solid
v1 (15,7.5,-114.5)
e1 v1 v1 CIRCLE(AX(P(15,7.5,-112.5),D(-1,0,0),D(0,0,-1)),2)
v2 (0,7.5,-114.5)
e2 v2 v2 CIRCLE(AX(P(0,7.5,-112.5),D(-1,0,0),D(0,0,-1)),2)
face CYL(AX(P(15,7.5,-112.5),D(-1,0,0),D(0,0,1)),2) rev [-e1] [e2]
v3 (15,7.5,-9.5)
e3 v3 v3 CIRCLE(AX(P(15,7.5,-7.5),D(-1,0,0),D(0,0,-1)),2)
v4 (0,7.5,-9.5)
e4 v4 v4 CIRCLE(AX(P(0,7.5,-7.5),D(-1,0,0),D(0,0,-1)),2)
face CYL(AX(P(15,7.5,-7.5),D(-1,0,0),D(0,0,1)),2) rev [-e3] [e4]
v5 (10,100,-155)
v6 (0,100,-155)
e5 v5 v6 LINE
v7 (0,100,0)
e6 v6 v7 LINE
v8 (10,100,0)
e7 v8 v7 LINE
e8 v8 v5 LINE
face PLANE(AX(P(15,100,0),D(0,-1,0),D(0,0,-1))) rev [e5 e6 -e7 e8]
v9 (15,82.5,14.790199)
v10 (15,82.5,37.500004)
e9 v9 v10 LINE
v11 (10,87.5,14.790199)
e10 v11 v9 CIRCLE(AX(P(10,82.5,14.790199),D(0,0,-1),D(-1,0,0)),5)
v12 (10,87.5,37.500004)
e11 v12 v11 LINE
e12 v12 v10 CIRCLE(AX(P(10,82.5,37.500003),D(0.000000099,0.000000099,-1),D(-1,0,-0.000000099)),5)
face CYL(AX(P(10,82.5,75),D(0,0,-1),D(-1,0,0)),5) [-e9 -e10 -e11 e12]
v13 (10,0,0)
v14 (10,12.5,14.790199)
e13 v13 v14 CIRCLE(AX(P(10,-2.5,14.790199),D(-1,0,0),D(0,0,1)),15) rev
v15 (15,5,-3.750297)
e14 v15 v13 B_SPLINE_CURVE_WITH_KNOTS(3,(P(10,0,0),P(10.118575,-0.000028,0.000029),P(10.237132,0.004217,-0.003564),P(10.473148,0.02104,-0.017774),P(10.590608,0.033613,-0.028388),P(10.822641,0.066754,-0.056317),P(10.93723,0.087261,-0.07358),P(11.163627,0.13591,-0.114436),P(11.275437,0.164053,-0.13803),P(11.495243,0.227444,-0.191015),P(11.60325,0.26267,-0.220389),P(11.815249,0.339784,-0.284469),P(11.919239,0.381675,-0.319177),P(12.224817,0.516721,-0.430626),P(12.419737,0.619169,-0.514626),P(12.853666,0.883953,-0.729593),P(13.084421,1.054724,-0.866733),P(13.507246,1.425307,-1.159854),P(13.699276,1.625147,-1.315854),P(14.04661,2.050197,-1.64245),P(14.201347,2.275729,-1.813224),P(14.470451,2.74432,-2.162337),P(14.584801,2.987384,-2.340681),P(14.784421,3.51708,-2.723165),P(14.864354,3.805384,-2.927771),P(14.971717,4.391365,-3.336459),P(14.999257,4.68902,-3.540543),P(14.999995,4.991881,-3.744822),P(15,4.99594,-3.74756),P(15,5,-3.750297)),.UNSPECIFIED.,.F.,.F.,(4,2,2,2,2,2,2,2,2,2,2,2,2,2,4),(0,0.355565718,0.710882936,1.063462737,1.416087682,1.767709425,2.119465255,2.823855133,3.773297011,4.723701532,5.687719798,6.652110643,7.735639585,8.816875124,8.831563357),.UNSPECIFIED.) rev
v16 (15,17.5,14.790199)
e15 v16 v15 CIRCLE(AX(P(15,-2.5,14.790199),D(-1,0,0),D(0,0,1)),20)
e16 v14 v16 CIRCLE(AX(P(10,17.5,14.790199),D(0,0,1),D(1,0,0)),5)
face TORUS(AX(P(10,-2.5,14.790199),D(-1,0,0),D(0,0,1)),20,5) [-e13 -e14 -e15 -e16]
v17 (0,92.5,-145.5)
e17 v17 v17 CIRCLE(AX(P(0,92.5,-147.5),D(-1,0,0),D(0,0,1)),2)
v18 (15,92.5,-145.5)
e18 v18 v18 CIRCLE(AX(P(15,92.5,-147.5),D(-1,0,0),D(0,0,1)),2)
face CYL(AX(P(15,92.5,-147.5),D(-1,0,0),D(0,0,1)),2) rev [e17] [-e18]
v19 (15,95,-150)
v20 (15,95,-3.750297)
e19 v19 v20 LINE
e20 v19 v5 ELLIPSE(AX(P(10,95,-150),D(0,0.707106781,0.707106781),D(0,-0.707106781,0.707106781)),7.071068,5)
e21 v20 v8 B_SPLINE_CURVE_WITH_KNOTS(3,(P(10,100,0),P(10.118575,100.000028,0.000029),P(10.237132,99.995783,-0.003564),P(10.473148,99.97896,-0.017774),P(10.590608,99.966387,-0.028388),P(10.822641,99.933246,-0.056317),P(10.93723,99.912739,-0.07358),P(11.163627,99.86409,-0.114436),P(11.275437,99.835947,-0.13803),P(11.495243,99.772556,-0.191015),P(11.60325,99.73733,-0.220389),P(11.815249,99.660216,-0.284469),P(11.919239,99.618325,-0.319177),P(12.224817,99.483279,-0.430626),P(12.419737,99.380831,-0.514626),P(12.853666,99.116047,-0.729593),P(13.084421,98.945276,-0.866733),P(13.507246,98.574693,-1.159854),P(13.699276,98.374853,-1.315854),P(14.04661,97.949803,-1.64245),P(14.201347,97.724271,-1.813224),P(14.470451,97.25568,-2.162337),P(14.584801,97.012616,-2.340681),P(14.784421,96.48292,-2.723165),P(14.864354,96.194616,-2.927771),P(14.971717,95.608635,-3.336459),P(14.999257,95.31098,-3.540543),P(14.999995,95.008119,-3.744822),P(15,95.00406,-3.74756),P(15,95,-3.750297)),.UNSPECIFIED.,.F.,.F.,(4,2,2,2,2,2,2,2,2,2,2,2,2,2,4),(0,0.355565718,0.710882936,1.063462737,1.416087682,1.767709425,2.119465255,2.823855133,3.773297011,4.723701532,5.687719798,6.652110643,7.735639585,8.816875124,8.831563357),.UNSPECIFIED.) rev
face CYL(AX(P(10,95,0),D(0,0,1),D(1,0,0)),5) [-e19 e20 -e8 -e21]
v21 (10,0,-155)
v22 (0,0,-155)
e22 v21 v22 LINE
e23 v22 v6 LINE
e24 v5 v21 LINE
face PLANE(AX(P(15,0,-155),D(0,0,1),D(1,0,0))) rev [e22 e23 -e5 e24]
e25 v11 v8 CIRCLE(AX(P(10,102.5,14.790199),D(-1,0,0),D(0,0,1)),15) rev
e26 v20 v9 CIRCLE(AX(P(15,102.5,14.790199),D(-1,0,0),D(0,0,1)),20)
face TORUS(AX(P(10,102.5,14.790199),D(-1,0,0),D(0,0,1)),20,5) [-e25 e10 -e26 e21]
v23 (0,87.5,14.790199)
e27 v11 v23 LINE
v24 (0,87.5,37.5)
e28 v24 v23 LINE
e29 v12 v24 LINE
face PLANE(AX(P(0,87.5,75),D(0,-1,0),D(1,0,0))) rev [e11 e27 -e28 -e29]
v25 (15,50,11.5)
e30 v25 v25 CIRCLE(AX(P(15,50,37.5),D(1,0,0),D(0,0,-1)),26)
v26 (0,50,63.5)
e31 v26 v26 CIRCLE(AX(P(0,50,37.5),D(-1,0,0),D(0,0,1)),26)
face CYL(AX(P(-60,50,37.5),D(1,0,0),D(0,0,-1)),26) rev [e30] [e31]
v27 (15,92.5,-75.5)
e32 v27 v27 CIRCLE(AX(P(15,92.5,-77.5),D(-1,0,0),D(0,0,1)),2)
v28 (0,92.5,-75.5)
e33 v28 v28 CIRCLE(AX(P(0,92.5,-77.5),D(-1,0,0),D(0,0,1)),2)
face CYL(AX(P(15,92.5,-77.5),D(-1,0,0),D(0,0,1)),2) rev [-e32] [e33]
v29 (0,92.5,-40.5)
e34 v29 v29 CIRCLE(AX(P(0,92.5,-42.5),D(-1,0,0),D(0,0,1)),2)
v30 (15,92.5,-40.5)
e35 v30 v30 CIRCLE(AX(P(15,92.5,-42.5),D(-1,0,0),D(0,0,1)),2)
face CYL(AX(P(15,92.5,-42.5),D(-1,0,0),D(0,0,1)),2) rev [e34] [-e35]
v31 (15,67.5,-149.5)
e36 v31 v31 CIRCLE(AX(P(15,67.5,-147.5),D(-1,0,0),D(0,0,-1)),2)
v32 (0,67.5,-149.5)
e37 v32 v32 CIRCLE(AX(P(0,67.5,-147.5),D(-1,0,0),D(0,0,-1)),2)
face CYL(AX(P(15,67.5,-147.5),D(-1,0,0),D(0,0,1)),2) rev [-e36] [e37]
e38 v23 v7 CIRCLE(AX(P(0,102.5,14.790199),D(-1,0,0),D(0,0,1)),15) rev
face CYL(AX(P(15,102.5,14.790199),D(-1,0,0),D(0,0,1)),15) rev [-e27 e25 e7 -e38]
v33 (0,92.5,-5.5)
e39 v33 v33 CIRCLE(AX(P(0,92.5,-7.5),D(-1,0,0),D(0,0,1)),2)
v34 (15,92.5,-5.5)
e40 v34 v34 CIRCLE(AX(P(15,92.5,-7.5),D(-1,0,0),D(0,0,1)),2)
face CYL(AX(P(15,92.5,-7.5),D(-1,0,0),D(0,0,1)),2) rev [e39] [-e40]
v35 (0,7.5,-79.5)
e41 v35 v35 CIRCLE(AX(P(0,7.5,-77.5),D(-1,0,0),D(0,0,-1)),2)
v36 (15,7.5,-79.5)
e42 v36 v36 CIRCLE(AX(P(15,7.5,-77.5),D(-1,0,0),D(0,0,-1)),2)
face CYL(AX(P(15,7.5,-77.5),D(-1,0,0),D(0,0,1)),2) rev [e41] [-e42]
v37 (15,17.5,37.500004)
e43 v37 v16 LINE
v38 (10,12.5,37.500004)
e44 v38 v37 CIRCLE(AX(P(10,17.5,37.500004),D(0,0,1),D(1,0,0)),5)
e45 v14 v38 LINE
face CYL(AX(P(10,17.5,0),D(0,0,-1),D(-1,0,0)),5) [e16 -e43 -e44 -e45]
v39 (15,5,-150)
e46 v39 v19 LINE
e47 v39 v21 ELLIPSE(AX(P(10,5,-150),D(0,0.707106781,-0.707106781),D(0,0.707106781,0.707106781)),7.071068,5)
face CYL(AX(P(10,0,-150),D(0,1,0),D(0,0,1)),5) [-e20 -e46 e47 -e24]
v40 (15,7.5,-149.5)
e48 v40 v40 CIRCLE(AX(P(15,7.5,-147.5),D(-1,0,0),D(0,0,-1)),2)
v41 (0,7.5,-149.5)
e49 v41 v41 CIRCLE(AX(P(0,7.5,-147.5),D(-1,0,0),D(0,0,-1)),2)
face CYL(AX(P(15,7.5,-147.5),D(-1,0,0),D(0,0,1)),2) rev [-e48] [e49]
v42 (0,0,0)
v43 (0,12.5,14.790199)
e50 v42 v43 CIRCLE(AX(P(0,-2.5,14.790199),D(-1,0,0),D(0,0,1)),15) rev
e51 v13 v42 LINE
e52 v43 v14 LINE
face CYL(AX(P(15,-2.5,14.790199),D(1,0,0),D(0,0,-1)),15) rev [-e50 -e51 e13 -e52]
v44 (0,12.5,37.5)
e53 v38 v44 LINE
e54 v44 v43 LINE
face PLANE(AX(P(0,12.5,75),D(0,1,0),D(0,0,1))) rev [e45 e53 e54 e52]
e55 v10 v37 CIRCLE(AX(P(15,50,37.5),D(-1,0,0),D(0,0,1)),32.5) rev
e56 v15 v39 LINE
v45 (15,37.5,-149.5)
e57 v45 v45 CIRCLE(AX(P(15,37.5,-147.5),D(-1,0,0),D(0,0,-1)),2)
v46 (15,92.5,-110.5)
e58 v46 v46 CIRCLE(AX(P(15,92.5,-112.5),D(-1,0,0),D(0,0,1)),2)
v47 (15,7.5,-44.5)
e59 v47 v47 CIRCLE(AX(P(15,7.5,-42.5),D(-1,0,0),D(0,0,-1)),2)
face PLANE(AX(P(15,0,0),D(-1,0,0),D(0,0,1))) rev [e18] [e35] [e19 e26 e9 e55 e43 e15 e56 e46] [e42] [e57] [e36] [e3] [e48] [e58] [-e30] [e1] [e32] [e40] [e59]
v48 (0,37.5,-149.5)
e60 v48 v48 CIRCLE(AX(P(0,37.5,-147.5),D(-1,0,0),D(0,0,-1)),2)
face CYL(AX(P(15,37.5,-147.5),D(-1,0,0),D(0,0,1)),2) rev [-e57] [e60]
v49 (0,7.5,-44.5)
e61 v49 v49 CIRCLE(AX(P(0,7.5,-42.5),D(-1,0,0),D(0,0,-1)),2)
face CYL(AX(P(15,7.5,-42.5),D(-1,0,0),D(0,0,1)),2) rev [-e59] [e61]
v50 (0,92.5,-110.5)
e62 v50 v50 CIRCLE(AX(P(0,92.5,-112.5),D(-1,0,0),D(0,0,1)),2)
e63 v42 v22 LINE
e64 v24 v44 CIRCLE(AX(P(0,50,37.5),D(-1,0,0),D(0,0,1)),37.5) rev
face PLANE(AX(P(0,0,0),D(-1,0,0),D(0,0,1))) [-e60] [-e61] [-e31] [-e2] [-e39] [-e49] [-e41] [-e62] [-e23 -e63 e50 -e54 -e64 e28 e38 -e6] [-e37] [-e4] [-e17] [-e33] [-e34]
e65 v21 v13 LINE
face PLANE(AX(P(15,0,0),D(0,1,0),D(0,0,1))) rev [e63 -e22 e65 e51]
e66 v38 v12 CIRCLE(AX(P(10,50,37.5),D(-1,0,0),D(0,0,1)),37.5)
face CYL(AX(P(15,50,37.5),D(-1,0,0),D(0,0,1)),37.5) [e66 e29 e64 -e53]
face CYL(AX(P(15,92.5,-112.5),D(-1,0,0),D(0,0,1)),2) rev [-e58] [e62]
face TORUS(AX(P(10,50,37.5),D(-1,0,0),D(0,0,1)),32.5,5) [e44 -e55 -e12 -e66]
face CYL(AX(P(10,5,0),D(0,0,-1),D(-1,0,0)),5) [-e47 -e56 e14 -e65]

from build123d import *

# Parameters (mm, degrees)
SKETCH1_W           = 155
SKETCH1_H           = 100
BOSS_EXTRUDE1_DEPTH = 15
SKETCH2_W           = 15
SKETCH2_H           = 75
BOSS_EXTRUDE2_DEPTH = 75
SKETCH3_R           = 26
CUT_EXTRUDE1_DEPTH  = 75
CUT_EXTRUDE2_START  = -15
CUT_EXTRUDE2_DEPTH  = 15
FILLET1_R           = 15
SKETCH5_R           = 2
CUT_EXTRUDE3_DEPTH  = 186.067555233
FILLET7_R           = 5


# Read off the part's stored shape, not the designer's step: Cut-Extrude2
with BuildPart() as part:
    # Sketch1 → Boss-Extrude1 (new body)
    with BuildSketch(Plane(origin=(0, 0, 0), x_dir=(0, 0, -1), z_dir=(1, 0, 0))):
        with Locations((77.5, 50)):
            Rectangle(SKETCH1_W, SKETCH1_H)
    extrude(amount=BOSS_EXTRUDE1_DEPTH)

    # Sketch2 → Boss-Extrude2 (add)
    with BuildSketch(Plane.XY):
        with Locations((7.5, 50)):
            Rectangle(SKETCH2_W, SKETCH2_H)
    extrude(amount=BOSS_EXTRUDE2_DEPTH)

    # Sketch3 → Cut-Extrude1 (cut)
    with BuildSketch(Plane(origin=(15, 0, 0), x_dir=(0, 0, -1), z_dir=(1, 0, 0))):
        with Locations((-37.5, 50)):
            Circle(SKETCH3_R)
    extrude(amount=-CUT_EXTRUDE1_DEPTH, mode=Mode.SUBTRACT)

    # Cut-Extrude2 outline → Cut-Extrude2 (cut)
    with BuildSketch(Plane(origin=(15, 0, 0), x_dir=(0, 0, -1), z_dir=(1, 0, 0)).offset(CUT_EXTRUDE2_START)):
        with BuildLine():
            Line((-75, 12.5), (-37.5, 12.5))
            ThreePointArc((-37.5, 12.5), (-64.016504294, 23.483495706), (-75, 50))
            Line((-75, 50), (-75, 12.5))
        make_face()
        with BuildLine():
            Line((-75, 87.5), (-75, 50))
            ThreePointArc((-75, 50), (-64.016504294, 76.516504294), (-37.5, 87.5))
            Line((-37.5, 87.5), (-75, 87.5))
        make_face()
    extrude(amount=CUT_EXTRUDE2_DEPTH, mode=Mode.SUBTRACT)

    # Fillet1
    # the kernel refuses this fillet: 15 mm, written as the material it adds along each edge
    with BuildSketch(Plane(origin=(15, 12.5, 0), x_dir=(0, -1, 0), z_dir=(-1, 0, 0))) as fillet1_piece_1:
        with BuildLine():
            CenterArc((15, 14.790199458), FILLET1_R, 180, 80.405931773)
            Line((0, 14.790199458), (-0.3, 14.790199458))
            Line((-0.3, 14.790199458), (-0.3, 0))
            Line((-0.3, 0), (0, -0.3))
            ThreePointArc((0, -0.3), (6.25, -0.3), (12.45, -0.295803989))
            Line((12.45, -0.295803989), (12.5, 0))
        make_face()
    extrude(amount=15)
    with BuildSketch(Plane(origin=(0, 87.5, 0), x_dir=(0, 0, 1), z_dir=(1, 0, 0))) as fillet1_piece_2:
        with BuildLine():
            CenterArc((14.790199458, -15), FILLET1_R, 90, 80.405931773)
            Line((0, -12.5), (-0.295803989, -12.45))
            ThreePointArc((-0.295803989, -12.45), (-0.3, -6.25), (-0.3, 0))
            Line((-0.3, 0), (0, 0.3))
            Line((0, 0.3), (14.790199458, 0.3))
            Line((14.790199458, 0.3), (14.790199458, 0))
        make_face()
    extrude(amount=15)

    # Sketch5 → Cut-Extrude3 (cut, through all)
    with BuildSketch(Plane.ZY):
        with Locations((-147.5, 92.5)):
            Circle(SKETCH5_R)
        with Locations((-112.5, 92.5)):
            Circle(SKETCH5_R)
        with Locations((-77.5, 92.5)):
            Circle(SKETCH5_R)
        with Locations((-42.5, 92.5)):
            Circle(SKETCH5_R)
        with Locations((-7.5, 92.5)):
            Circle(SKETCH5_R)
        with Locations(Location((-7.5, 7.5, 0), (0, 0, 180))):
            Circle(SKETCH5_R)
        with Locations(Location((-42.5, 7.5, 0), (0, 0, 180))):
            Circle(SKETCH5_R)
        with Locations(Location((-77.5, 7.5, 0), (0, 0, 180))):
            Circle(SKETCH5_R)
        with Locations(Location((-112.5, 7.5, 0), (0, 0, 180))):
            Circle(SKETCH5_R)
        with Locations(Location((-147.5, 7.5, 0), (0, 0, 180))):
            Circle(SKETCH5_R)
        with Locations(Location((-147.5, 37.5, 0), (0, 0, 180))):
            Circle(SKETCH5_R)
        with Locations(Location((-147.5, 67.5, 0), (0, 0, 180))):
            Circle(SKETCH5_R)
    extrude(amount=-CUT_EXTRUDE3_DEPTH, mode=Mode.SUBTRACT)

    # Fillet7
    fillet7_edges = [part.edges().sort_by_distance(p)[0] for p in [
        (15, 50, -155),
        (15, 100, -77.5),
        (15, 12.5, 26.145099729),
        (15, 87.5, 26.145099729),
        (15, 76.516504294, 64.016504294),
        (15, 8.956439237, 5.107741092),
        (15, 91.043560763, 5.107741092),
        (15, 0, -77.5),
    ]]
    fillet(fillet7_edges, radius=FILLET7_R)


solid = part.part
